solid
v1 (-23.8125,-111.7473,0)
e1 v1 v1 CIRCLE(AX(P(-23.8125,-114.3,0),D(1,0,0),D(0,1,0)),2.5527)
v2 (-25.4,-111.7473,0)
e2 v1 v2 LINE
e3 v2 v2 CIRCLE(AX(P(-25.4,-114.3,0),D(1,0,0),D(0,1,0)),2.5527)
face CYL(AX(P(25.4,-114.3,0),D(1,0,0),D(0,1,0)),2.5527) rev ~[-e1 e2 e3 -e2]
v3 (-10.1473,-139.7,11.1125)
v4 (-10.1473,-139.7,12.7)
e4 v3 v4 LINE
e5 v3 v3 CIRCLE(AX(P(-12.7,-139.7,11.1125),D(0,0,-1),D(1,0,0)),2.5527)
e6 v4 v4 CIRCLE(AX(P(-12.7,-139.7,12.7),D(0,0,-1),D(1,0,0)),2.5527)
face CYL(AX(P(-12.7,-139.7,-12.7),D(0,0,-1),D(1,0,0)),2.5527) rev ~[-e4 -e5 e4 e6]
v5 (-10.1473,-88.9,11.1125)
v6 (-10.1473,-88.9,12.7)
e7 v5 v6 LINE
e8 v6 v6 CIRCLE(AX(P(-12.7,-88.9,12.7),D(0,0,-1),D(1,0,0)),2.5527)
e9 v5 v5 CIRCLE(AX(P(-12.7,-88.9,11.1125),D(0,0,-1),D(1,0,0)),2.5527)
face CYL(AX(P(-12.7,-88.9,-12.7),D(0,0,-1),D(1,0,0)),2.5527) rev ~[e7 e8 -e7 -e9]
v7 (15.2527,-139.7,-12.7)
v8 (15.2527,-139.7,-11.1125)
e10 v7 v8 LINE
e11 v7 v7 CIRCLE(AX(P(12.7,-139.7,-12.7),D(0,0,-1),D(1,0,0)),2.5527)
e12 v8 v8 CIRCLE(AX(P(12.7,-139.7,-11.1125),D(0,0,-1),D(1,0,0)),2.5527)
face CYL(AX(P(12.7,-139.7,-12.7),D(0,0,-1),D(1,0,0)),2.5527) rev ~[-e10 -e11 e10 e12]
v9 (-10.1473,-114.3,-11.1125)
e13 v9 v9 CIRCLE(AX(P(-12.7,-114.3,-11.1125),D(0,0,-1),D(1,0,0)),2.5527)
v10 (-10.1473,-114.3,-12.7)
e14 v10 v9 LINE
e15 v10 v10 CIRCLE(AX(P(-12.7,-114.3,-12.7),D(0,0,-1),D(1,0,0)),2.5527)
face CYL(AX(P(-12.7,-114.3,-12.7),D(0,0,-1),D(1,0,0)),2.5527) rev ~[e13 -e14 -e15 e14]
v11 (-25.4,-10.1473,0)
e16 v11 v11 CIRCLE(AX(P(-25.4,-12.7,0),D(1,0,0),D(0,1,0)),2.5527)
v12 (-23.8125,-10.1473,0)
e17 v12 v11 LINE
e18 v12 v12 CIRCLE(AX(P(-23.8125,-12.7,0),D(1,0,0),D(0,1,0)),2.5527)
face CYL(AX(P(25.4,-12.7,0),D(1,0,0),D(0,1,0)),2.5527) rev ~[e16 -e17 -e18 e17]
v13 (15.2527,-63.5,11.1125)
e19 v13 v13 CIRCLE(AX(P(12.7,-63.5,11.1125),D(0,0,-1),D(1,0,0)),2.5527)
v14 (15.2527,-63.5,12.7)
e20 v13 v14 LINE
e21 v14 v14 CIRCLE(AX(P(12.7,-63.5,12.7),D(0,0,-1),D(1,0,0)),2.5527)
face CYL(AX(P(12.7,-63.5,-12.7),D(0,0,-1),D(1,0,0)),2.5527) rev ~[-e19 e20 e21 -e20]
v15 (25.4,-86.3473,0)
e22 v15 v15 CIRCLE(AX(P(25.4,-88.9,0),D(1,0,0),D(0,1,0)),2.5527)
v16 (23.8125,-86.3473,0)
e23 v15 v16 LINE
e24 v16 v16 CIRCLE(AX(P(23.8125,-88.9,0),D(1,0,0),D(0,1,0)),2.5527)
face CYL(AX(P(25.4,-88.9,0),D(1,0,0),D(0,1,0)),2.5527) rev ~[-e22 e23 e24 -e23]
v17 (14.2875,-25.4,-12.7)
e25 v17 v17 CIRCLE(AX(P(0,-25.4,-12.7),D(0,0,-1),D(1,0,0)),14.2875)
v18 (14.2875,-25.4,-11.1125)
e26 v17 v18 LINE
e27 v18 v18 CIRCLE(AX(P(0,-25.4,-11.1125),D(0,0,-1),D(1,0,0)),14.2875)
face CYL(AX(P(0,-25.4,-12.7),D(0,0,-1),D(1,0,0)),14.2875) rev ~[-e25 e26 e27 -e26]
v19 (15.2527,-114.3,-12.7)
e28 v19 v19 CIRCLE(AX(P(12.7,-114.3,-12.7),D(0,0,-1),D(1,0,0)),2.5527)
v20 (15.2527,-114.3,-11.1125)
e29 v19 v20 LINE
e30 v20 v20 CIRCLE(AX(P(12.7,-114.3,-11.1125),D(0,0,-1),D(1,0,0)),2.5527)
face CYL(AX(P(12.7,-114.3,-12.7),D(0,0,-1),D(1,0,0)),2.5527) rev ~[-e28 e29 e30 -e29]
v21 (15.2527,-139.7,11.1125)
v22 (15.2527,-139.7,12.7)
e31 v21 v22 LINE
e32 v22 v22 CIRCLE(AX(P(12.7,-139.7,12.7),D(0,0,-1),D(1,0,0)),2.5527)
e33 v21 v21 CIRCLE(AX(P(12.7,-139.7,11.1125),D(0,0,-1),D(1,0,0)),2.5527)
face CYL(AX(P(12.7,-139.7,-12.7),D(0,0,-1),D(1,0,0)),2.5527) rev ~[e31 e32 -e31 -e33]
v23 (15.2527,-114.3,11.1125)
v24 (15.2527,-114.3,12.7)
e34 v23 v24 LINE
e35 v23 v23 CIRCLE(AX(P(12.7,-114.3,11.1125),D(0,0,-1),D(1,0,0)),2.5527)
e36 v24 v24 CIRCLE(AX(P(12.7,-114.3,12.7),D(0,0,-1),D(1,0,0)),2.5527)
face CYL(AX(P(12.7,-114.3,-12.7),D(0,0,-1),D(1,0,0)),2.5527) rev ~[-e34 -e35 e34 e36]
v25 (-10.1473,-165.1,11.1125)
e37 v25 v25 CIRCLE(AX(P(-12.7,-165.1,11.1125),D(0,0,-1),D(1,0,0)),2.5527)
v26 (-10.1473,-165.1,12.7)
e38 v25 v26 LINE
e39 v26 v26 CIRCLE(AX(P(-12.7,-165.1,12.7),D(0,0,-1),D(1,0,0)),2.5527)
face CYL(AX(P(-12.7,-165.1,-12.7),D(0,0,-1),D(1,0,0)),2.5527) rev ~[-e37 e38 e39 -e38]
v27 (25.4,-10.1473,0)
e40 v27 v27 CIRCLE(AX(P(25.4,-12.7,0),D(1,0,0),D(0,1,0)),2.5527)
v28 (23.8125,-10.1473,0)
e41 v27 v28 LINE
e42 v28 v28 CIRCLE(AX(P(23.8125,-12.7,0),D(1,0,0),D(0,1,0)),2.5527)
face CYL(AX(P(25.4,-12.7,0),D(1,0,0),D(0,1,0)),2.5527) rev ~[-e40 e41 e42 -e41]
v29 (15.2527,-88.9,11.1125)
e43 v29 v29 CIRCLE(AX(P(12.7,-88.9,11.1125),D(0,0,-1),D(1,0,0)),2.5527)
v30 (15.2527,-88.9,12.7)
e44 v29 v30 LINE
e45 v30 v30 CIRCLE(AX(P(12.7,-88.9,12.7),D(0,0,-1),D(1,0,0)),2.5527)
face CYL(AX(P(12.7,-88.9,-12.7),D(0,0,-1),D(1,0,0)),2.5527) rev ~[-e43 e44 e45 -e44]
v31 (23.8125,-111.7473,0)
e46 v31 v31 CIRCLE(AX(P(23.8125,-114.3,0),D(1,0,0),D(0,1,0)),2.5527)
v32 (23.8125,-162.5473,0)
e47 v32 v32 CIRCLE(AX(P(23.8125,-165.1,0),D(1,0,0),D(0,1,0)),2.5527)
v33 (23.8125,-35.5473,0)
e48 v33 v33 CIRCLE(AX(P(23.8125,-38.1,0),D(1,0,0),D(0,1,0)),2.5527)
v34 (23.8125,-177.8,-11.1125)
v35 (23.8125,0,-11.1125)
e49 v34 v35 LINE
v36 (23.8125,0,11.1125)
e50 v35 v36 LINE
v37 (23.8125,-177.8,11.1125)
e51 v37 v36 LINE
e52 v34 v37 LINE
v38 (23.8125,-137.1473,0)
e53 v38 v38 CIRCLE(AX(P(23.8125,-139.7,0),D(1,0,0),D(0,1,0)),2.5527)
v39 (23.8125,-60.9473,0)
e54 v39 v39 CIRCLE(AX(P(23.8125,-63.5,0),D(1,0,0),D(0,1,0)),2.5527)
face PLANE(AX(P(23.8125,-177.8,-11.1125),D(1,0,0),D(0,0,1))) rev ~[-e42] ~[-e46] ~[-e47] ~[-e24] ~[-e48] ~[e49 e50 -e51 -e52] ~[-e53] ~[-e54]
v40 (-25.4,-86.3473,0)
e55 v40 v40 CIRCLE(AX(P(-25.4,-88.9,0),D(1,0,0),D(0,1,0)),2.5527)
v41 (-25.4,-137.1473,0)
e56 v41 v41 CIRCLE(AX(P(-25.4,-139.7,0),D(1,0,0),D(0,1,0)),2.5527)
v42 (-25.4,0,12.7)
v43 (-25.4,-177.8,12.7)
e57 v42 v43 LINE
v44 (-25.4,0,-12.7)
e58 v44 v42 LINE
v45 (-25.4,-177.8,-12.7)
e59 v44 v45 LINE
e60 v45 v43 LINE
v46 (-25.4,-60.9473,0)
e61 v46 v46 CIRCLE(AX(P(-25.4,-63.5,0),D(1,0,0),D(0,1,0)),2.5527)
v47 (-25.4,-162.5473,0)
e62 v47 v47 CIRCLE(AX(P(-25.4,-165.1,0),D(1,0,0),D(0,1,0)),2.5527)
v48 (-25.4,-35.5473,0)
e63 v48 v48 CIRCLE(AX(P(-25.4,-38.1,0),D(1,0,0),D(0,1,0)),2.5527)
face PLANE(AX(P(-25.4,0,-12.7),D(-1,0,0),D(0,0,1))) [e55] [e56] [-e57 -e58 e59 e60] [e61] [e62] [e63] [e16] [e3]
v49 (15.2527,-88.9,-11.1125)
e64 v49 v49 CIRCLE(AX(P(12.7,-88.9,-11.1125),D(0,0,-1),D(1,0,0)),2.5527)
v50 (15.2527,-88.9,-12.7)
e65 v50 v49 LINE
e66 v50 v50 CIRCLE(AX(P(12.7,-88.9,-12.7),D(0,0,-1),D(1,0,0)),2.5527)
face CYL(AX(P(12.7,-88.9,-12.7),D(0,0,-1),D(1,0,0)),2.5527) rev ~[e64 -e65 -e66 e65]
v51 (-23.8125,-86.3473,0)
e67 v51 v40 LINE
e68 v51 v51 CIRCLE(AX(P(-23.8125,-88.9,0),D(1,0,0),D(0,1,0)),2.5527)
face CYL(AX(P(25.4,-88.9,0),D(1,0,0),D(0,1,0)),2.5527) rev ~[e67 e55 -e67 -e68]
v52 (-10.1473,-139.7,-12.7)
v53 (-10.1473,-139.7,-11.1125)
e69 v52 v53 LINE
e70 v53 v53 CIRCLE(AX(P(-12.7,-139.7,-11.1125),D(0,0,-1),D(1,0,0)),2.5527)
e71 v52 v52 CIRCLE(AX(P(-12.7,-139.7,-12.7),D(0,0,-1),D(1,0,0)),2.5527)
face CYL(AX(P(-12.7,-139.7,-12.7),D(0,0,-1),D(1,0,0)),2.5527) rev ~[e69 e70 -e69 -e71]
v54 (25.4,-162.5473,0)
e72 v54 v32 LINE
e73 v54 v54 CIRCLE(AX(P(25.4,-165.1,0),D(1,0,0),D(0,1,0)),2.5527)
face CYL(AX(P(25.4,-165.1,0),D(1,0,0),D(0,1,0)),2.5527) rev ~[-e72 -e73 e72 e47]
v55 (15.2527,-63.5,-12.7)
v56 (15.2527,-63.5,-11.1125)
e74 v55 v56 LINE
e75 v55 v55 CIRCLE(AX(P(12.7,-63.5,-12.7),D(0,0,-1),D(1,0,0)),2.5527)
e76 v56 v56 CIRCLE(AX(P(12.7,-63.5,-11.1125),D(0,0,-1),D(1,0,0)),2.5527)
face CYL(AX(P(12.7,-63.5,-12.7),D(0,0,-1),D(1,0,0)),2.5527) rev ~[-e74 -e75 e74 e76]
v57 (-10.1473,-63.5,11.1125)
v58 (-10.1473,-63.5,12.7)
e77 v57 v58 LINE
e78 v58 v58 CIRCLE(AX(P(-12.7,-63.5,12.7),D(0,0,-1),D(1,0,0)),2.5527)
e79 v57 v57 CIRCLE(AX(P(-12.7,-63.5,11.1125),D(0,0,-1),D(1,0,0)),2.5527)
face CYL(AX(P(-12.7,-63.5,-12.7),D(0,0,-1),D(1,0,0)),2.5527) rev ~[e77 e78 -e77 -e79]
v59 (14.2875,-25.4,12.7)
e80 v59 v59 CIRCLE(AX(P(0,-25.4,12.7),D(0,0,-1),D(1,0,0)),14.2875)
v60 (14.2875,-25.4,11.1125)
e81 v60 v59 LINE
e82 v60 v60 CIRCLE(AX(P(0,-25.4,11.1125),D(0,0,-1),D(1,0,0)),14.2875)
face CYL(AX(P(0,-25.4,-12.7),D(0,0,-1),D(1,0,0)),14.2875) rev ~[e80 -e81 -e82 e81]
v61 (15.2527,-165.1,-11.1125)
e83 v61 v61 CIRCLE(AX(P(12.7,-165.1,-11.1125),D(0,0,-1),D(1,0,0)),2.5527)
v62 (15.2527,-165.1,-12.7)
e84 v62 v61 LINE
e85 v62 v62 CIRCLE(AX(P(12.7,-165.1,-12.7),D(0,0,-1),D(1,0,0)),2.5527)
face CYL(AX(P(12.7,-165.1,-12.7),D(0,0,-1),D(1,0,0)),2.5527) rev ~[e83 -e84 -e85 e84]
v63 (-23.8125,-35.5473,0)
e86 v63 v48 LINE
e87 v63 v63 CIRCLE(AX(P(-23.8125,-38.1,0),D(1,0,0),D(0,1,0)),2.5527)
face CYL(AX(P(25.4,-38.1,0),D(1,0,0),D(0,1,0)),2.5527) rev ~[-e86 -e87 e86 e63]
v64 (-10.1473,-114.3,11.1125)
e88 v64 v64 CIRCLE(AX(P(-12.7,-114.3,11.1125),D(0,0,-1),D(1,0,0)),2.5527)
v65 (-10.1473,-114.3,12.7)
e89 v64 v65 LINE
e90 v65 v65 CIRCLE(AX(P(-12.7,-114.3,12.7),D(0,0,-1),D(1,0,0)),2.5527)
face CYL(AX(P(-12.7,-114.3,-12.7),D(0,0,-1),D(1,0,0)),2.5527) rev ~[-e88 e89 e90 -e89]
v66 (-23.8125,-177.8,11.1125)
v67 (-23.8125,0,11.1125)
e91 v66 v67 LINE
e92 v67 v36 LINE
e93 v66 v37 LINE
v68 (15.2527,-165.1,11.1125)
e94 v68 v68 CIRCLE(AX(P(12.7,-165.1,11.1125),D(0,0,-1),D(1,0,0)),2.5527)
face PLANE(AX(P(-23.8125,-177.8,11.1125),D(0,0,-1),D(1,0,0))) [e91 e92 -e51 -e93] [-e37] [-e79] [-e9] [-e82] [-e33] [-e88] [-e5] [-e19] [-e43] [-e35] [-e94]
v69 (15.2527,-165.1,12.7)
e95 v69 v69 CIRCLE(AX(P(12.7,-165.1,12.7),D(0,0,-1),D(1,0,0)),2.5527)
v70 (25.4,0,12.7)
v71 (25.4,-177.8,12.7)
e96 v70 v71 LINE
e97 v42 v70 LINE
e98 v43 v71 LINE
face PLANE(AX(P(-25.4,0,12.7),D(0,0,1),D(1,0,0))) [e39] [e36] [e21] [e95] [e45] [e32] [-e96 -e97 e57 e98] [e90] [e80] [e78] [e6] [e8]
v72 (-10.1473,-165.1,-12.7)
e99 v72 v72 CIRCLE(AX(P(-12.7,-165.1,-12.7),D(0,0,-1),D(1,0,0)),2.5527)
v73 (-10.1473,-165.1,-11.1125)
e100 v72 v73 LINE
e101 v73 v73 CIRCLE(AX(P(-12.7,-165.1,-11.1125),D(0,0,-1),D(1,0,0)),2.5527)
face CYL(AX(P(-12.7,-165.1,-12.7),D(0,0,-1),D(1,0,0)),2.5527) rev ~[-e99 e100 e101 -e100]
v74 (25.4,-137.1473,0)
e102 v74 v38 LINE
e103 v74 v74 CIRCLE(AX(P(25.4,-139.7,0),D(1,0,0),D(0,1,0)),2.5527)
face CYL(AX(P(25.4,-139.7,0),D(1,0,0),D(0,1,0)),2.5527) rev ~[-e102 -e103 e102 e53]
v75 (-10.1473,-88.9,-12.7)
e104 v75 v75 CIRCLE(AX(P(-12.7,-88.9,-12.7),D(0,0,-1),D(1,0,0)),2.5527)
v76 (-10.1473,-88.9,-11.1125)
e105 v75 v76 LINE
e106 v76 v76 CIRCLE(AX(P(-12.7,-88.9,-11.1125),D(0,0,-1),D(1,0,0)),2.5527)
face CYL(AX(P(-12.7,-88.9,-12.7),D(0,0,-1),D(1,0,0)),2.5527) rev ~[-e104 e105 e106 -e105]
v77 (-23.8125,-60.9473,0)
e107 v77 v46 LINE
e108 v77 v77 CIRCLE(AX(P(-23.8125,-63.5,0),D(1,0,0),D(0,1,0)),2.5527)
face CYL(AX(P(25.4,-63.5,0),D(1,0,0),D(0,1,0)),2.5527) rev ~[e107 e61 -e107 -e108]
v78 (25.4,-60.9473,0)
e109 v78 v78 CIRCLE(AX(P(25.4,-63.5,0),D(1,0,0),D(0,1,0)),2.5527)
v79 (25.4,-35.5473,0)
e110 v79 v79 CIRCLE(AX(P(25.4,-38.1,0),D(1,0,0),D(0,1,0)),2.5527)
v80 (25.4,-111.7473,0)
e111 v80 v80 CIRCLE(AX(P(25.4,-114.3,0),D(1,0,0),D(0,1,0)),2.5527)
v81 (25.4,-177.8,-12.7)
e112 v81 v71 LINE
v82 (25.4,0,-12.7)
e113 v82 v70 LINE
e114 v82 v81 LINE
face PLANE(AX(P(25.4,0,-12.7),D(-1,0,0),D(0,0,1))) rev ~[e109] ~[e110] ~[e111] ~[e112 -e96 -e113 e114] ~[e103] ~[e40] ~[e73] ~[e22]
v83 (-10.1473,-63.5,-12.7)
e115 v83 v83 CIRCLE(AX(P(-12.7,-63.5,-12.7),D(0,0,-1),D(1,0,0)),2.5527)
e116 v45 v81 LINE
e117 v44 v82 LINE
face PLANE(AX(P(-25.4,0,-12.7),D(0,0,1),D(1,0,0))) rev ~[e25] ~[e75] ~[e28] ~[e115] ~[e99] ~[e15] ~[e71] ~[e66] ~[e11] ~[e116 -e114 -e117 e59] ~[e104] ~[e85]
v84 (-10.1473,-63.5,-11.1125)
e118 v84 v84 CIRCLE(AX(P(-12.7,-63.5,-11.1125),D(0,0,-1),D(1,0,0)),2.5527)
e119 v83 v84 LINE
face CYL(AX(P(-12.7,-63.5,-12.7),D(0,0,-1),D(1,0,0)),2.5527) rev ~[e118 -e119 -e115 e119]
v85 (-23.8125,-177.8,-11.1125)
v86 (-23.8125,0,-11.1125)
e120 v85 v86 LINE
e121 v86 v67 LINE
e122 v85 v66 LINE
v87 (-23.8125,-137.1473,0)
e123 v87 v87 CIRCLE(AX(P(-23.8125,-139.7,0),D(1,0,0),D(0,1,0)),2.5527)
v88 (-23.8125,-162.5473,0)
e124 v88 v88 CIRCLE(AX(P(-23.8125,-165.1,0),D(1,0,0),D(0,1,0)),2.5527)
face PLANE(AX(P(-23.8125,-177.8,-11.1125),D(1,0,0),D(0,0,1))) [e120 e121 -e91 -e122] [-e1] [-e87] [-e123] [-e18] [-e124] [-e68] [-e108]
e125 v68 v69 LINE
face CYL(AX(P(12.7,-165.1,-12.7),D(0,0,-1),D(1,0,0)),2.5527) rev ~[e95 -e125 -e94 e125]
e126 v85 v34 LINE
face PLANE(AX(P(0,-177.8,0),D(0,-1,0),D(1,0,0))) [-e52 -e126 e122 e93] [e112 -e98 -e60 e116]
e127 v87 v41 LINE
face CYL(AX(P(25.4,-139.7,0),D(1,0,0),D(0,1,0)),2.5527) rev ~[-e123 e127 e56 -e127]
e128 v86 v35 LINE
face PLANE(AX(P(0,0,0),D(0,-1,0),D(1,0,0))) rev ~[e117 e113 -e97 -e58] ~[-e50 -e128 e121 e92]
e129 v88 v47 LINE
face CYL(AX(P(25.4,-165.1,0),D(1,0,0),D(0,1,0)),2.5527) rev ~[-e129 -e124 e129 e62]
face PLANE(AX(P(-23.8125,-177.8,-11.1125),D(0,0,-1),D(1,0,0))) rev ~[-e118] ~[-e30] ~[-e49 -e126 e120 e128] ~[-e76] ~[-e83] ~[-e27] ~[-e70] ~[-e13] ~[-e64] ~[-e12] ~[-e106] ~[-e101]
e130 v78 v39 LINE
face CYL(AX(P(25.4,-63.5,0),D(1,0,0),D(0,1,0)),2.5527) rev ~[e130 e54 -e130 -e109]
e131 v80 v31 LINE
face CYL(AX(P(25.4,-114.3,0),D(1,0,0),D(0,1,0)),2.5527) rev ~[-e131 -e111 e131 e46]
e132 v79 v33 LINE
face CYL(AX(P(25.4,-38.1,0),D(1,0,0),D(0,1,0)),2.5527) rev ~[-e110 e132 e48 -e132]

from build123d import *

# Parameters (mm, degrees)
F0_W     = 50.8
F0_H     = 25.4
F1_DEPTH = 177.8
F3_W     = 47.625
F3_H     = 22.225
F4_DEPTH = 203.2
F2_R     = 2.5527
F5_DEPTH = 76.2
F6_R     = 2.5527
F7_DEPTH = 50.8
F6_R_2   = 14.2875
F8_DEPTH = 50.8


# Not quite as in the source:
# - a feature names something its author has since deleted; it is built from what else it names


with BuildPart() as f1:
    # F0 (on Front) → F1 (new body)
    with BuildSketch(Plane.XZ):
        Rectangle(F0_W, F0_H)
    extrude(amount=F1_DEPTH)

    # F3 (on face) → F4 (cut)
    with BuildSketch(Plane.XZ.offset(177.8)):
        Rectangle(F3_W, F3_H)
    extrude(amount=-F4_DEPTH, mode=Mode.SUBTRACT)

    # F2 (on face) → F5 (cut)
    with BuildSketch(Plane.YZ.offset(25.4)):
        with Locations((-165.1, 0)):
            Circle(F2_R)
        with Locations((-139.7, 0)):
            Circle(F2_R)
        with Locations((-114.3, 0)):
            Circle(F2_R)
        with Locations((-88.9, 0)):
            Circle(F2_R)
        with Locations((-63.5, 0)):
            Circle(F2_R)
        with Locations((-38.1, 0)):
            Circle(F2_R)
        with Locations((-12.7, 0)):
            Circle(F2_R)
        with Locations((12.7, 0)):
            Circle(F2_R)
    extrude(amount=-F5_DEPTH, mode=Mode.SUBTRACT)

    # F6 (on face) → F7 (cut)
    with BuildSketch(Plane(origin=(0, 0, -12.7), x_dir=(1, 0, 0), z_dir=(0, 0, -1))):
        with Locations((-12.7, 165.1)):
            Circle(F6_R)
        with Locations((-12.7, 139.7)):
            Circle(F6_R)
        with Locations((-12.7, 114.3)):
            Circle(F6_R)
        with Locations((-12.7, 88.9)):
            Circle(F6_R)
        with Locations((-12.7, 63.5)):
            Circle(F6_R)
        with Locations((12.7, 63.5)):
            Circle(F6_R)
        with Locations((12.7, 88.9)):
            Circle(F6_R)
        with Locations((12.7, 114.3)):
            Circle(F6_R)
        with Locations((12.7, 139.7)):
            Circle(F6_R)
        with Locations((12.7, 165.1)):
            Circle(F6_R)
    extrude(amount=-F7_DEPTH, mode=Mode.SUBTRACT)

    # F6 (on face) → F8 (cut)
    with BuildSketch(Plane(origin=(0, 0, -12.7), x_dir=(1, 0, 0), z_dir=(0, 0, -1))):
        with Locations((0, 25.4)):
            Circle(F6_R_2)
    extrude(amount=-F8_DEPTH, mode=Mode.SUBTRACT)


solid = f1.part
